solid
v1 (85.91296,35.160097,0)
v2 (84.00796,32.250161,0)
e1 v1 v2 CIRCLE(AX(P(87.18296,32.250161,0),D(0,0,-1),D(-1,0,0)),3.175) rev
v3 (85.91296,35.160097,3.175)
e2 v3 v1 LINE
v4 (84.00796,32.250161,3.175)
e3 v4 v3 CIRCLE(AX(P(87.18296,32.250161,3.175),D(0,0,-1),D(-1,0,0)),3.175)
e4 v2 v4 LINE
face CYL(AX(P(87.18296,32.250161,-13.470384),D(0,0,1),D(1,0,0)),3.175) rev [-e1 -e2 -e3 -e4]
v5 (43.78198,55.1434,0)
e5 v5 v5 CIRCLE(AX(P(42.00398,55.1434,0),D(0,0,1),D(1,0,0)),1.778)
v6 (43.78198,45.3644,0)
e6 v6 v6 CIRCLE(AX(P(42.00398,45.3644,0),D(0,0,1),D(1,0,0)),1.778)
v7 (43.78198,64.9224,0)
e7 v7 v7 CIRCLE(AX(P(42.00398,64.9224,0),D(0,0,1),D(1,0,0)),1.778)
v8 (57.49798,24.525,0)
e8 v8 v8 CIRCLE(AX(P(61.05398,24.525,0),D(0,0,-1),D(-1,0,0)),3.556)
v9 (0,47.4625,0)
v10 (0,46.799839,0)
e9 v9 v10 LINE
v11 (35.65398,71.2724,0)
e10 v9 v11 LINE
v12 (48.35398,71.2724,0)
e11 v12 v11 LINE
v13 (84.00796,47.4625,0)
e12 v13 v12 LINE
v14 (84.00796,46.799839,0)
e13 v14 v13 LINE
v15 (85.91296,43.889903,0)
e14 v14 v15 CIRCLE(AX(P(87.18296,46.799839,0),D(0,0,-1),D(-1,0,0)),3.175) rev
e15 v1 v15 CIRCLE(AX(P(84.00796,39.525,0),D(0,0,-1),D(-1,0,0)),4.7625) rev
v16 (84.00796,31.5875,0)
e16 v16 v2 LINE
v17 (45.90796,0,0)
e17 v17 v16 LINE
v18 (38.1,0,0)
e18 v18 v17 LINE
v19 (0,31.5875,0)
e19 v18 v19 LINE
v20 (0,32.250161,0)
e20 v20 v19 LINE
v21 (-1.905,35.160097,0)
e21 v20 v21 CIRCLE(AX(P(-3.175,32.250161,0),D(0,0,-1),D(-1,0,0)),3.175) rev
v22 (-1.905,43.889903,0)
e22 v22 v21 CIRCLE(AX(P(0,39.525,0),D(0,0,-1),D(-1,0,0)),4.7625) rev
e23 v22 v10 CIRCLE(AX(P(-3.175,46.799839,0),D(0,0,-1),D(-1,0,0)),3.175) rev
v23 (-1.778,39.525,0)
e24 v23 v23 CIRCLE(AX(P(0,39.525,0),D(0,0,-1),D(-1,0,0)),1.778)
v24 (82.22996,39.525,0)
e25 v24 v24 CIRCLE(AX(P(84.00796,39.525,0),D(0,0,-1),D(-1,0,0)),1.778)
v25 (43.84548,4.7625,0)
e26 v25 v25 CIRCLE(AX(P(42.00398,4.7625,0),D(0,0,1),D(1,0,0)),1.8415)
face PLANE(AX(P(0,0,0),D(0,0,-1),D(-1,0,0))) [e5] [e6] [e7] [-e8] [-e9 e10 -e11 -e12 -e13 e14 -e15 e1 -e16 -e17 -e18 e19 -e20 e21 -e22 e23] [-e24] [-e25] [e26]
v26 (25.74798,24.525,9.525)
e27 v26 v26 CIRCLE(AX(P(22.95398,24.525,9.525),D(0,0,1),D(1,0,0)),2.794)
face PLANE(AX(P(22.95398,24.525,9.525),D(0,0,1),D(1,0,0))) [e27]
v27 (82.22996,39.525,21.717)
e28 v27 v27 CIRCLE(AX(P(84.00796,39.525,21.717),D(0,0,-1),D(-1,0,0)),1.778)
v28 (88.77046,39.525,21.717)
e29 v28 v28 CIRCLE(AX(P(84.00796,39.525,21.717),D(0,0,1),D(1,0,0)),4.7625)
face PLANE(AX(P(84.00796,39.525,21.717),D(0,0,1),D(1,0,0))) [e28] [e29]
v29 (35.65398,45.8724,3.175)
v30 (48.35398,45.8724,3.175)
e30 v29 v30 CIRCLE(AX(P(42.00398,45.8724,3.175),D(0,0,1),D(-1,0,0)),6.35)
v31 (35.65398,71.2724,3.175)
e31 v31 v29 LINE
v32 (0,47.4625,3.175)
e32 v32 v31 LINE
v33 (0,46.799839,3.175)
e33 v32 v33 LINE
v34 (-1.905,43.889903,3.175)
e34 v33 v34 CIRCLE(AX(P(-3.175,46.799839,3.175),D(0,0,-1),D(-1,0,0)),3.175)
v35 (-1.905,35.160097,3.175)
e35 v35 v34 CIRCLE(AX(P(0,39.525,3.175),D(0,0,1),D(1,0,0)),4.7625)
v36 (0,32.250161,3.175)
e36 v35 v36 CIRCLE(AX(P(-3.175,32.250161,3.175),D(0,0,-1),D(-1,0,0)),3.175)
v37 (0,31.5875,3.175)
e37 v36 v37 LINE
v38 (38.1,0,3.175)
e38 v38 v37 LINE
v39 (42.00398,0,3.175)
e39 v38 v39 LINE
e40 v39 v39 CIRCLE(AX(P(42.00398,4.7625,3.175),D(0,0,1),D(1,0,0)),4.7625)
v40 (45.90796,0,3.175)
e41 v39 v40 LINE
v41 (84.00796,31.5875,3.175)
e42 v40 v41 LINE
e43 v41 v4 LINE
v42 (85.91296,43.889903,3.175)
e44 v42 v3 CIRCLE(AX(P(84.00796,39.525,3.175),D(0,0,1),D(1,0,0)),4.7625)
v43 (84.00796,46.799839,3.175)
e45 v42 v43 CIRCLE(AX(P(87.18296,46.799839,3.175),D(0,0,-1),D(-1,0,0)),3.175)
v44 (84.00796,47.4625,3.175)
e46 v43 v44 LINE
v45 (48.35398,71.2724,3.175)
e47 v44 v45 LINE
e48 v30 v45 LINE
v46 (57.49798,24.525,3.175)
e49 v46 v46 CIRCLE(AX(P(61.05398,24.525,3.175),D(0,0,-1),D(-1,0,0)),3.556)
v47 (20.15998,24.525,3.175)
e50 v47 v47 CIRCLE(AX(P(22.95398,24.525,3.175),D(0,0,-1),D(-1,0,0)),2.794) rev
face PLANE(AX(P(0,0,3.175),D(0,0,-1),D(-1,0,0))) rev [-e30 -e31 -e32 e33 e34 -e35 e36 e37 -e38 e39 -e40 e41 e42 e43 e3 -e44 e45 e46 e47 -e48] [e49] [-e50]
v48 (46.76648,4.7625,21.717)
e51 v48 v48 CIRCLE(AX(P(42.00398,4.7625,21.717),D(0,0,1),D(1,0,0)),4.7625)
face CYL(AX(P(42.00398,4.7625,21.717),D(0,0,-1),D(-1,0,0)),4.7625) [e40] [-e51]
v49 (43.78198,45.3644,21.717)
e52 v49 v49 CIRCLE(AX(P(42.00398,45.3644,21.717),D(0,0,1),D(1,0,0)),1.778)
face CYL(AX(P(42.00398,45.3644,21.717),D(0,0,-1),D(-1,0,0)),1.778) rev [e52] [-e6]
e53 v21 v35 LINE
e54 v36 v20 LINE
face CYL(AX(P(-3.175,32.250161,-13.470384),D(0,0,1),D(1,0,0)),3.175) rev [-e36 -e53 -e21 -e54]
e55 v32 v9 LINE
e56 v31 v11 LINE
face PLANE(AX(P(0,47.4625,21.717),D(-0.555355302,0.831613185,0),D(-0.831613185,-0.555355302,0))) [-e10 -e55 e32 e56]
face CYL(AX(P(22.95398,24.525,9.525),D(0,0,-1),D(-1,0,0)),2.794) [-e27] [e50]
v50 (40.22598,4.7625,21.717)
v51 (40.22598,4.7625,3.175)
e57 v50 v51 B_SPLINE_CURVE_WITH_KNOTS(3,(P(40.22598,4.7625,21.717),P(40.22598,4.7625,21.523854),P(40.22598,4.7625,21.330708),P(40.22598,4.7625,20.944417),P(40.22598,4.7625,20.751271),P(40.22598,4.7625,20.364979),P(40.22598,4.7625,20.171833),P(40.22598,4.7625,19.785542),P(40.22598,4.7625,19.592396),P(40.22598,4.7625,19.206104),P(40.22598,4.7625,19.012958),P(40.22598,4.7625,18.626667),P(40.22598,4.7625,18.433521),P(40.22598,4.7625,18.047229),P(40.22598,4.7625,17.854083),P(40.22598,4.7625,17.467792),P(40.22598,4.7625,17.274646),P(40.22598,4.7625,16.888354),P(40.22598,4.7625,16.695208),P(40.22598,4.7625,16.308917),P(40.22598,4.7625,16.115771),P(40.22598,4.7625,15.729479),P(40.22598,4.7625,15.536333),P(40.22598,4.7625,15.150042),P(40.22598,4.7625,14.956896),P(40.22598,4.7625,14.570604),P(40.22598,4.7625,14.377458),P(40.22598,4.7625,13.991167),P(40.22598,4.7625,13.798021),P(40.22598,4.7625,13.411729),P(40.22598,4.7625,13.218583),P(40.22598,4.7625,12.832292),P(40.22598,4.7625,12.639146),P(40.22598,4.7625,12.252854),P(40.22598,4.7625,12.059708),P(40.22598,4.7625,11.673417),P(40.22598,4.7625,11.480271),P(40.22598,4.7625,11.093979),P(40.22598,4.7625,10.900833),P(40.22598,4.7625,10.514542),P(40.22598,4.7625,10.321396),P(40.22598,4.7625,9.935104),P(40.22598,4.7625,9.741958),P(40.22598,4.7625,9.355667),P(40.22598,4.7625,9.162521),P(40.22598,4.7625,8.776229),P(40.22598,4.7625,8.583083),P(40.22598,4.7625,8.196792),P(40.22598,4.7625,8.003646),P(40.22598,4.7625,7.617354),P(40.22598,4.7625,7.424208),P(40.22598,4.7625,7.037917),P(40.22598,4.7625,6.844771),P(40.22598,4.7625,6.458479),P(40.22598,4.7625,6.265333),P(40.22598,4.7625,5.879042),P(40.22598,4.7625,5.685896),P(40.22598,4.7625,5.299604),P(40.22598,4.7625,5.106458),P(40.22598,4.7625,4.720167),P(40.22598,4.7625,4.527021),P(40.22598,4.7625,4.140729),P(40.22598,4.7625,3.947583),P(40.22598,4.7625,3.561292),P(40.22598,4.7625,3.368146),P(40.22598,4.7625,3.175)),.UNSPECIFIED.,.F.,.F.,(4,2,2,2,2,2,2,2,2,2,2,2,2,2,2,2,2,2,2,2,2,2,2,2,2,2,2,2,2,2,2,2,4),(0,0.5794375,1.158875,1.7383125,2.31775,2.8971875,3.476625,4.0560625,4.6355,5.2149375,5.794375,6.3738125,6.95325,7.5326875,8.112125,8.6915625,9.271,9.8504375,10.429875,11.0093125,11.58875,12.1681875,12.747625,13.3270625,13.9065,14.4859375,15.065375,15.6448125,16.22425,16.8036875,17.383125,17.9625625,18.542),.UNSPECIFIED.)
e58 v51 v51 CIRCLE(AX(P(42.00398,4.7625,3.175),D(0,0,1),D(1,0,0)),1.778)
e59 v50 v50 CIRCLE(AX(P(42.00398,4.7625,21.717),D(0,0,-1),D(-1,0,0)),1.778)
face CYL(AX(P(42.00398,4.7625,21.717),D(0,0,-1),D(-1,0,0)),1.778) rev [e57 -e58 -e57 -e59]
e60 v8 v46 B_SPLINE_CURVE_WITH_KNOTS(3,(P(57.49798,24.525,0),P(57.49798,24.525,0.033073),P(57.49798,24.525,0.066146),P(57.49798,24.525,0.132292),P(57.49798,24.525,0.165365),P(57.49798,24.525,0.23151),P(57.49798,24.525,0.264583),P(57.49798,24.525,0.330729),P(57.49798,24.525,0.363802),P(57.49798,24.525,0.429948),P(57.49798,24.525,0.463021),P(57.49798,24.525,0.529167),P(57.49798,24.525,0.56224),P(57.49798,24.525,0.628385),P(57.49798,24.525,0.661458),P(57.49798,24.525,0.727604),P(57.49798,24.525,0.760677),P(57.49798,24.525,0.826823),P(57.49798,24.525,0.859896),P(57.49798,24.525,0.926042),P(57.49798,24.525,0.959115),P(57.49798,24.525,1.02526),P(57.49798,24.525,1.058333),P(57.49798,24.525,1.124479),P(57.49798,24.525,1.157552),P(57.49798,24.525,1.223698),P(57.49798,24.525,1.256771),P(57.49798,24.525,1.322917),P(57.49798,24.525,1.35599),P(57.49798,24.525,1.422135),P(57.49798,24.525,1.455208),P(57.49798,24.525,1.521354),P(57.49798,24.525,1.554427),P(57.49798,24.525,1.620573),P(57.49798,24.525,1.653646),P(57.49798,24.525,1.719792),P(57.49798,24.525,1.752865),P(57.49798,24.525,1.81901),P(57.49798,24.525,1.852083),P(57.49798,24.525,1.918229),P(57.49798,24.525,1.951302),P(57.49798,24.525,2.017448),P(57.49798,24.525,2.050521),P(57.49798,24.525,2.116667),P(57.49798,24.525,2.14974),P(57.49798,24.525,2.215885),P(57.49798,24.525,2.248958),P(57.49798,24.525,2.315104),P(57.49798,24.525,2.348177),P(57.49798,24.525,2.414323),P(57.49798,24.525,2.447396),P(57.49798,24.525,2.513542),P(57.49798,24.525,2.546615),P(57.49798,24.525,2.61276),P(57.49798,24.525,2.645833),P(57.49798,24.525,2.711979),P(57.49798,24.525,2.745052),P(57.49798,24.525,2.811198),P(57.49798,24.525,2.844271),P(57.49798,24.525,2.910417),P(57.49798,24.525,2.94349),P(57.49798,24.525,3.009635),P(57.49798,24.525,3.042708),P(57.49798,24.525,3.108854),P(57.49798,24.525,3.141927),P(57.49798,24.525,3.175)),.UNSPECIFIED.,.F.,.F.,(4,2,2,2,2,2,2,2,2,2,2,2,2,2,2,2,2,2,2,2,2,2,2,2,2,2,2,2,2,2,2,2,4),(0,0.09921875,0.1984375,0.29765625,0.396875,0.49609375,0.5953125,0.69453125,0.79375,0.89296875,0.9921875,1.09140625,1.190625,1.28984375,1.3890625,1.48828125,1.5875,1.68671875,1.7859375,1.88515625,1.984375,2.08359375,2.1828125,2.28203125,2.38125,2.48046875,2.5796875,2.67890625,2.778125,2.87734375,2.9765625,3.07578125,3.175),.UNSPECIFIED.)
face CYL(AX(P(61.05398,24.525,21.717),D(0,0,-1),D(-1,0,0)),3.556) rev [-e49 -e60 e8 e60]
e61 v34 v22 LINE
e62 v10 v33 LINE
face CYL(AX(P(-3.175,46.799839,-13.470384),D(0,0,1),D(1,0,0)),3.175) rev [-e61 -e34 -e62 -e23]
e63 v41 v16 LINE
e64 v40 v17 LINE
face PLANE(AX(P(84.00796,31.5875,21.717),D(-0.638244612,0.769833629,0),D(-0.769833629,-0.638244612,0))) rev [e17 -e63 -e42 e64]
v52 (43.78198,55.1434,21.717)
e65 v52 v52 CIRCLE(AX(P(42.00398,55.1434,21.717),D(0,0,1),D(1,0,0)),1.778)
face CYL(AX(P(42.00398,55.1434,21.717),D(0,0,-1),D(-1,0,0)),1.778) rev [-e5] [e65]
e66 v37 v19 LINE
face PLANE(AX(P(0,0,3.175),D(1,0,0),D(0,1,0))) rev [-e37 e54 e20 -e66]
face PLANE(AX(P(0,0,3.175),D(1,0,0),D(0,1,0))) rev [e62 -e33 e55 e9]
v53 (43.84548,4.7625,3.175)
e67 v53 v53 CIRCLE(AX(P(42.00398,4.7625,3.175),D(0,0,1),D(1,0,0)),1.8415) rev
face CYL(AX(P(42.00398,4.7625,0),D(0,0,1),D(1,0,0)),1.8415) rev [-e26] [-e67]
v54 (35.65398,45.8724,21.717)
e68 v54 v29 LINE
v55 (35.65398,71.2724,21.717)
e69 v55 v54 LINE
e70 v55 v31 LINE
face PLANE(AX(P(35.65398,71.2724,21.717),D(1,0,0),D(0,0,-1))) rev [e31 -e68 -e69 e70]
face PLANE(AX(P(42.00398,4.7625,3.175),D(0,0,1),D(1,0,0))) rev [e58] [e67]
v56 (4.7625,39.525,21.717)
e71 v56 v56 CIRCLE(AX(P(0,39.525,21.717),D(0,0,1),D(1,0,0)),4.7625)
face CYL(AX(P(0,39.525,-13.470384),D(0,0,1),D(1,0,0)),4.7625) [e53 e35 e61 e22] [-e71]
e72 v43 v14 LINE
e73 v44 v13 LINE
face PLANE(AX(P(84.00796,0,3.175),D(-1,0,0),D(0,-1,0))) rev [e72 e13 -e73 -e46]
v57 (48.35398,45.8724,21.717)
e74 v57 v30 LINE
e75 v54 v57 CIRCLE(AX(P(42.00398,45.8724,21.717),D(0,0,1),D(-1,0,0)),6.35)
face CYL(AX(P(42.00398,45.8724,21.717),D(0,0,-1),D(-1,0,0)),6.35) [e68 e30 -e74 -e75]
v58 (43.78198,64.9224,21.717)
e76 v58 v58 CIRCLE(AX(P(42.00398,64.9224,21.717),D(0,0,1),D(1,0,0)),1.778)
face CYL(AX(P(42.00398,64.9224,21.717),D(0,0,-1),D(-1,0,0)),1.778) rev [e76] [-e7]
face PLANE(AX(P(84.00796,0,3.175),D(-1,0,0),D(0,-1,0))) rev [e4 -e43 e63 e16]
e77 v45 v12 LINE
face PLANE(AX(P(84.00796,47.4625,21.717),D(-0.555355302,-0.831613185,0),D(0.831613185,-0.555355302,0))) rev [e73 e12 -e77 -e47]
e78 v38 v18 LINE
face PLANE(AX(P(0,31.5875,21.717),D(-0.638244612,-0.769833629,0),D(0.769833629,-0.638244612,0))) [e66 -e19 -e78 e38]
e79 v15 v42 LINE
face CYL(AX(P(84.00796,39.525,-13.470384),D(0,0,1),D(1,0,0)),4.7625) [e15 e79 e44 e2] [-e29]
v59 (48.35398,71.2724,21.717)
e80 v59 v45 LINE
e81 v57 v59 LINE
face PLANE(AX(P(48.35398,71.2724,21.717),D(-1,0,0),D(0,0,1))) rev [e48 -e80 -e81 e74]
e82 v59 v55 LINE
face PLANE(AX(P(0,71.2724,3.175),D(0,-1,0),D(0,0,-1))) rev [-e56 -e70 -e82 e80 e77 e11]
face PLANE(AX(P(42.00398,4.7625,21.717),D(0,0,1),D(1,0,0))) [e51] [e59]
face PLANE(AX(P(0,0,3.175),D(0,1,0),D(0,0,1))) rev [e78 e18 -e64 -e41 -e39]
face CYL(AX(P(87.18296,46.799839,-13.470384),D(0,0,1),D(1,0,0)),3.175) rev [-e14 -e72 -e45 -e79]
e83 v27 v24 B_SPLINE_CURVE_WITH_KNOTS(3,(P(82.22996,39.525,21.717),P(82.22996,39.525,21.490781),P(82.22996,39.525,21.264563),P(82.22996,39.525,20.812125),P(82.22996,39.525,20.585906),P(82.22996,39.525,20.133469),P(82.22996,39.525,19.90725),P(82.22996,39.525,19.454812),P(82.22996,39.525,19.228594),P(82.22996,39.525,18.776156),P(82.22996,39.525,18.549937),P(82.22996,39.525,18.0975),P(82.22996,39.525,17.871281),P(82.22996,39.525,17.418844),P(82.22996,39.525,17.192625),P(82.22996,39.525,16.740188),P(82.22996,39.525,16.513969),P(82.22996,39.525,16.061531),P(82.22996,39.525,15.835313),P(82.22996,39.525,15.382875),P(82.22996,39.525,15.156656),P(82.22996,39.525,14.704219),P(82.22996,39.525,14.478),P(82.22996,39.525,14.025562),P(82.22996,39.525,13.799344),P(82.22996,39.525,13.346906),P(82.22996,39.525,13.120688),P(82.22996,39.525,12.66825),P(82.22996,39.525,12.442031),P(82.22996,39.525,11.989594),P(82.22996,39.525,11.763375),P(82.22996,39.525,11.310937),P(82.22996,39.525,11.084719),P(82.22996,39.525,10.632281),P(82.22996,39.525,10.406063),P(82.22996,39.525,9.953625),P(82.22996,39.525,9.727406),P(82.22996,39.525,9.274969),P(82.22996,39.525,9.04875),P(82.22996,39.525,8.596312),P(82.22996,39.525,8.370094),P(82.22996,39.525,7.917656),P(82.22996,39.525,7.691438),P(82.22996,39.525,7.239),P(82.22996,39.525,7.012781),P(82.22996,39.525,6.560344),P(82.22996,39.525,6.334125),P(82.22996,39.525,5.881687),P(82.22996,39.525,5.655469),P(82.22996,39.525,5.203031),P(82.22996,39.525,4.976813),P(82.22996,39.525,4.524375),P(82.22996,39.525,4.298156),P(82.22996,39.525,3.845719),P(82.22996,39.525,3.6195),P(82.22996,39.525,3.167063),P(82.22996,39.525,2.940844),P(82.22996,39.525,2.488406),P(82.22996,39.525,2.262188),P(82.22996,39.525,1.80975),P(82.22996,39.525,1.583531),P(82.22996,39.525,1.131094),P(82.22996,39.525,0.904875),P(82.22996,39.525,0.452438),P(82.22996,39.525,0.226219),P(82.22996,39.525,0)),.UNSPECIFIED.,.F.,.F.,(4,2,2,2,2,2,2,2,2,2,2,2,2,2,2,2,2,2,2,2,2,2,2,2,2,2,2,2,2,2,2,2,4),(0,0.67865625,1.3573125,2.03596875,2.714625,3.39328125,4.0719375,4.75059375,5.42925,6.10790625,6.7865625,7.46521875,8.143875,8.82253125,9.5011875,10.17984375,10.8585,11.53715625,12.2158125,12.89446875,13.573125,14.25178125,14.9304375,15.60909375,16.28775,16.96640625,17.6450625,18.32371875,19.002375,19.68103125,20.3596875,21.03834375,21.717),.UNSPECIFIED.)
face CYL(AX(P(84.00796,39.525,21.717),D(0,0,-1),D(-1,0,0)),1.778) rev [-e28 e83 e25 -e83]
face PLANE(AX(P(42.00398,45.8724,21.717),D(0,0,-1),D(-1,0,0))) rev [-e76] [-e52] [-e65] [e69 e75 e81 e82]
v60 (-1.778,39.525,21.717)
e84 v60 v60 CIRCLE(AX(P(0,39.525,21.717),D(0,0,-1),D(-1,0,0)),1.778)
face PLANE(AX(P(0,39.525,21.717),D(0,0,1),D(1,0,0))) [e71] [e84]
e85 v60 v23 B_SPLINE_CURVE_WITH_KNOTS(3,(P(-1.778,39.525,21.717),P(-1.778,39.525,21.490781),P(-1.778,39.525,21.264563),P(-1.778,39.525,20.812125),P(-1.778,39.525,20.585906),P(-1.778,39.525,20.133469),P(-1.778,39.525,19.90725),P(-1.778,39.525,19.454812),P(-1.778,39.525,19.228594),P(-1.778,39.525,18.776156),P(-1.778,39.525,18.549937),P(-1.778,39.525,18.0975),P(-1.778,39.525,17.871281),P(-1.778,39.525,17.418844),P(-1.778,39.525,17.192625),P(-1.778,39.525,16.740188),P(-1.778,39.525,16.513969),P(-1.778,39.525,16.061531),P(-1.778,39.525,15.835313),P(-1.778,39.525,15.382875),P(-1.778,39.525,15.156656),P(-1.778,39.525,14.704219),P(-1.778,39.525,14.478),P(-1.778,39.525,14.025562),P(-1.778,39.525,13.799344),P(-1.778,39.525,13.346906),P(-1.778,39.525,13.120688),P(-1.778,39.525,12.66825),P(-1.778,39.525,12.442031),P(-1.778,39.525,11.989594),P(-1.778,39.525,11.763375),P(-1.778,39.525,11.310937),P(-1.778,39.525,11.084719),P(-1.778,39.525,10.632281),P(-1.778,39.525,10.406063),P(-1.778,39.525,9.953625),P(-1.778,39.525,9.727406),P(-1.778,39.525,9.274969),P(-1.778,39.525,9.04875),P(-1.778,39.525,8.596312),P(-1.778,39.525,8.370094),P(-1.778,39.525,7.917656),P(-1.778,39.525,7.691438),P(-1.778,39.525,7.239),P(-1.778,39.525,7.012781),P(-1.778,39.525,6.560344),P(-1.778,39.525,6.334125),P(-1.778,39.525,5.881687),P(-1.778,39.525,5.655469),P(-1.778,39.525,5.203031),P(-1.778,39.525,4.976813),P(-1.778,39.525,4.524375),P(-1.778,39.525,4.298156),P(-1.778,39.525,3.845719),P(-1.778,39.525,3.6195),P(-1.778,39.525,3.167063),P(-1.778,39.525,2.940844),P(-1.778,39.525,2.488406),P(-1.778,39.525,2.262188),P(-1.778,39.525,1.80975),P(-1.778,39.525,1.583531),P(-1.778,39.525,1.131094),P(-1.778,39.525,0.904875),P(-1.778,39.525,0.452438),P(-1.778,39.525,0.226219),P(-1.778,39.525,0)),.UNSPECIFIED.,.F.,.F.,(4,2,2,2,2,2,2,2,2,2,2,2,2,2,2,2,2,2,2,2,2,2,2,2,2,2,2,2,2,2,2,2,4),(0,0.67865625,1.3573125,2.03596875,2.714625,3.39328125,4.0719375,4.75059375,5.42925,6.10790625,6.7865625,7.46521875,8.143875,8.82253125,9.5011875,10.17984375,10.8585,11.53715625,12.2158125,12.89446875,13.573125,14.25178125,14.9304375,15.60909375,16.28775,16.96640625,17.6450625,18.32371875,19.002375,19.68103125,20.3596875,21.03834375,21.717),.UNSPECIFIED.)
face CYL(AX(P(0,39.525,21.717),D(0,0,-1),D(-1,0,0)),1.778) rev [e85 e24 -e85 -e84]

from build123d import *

# Parameters (mm, degrees)
SKETCH1_W               = 84.00796
SKETCH1_H               = 71.2724
BOSS_EXTRUDE1_DEPTH     = 3.175
SKETCH5_R               = 4.7625
BOSS_EXTRUDE3_DEPTH     = 3.175
SKETCH3_R               = 1.8415
CUT_EXTRUDE1_DEPTH      = 114.886040389
BOSS_EXTRUDE4_START     = 18.542
SKETCH6_R               = 4.7625
BOSS_EXTRUDE4_DEPTH     = 18.542
CUT_EXTRUDE2_DEPTH      = 116.341906237
CUT_EXTRUDE2_DEPTH_BACK = 116.341906237
SKETCH4_R               = 1.778
SKETCH7_R               = 1.778
CUT_EXTRUDE3_DEPTH      = 116.894683482
SKETCH8_R               = 3.556
SKETCH8_R_2             = 1.905
CUT_EXTRUDE4_DEPTH      = 116.894683482
CUT_EXTRUDE5_DEPTH      = 116.894683482
FILLET1_R               = 3.175
SKETCH10_R              = 2.794
BOSS_EXTRUDE5_DEPTH     = 6.35
BOSS_EXTRUDE6_START     = 3.175
SKETCH11_R              = 1.905
BOSS_EXTRUDE6_DEPTH     = 3.175


with BuildPart() as part:
    # Sketch1 → Boss-Extrude1 (new body)
    with BuildSketch(Plane.XY):
        with Locations((42.00398, 35.6362)):
            Rectangle(SKETCH1_W, SKETCH1_H)
    extrude(amount=BOSS_EXTRUDE1_DEPTH)

    # Sketch5 → Boss-Extrude3 (add)
    with BuildSketch(Plane.XY.offset(3.175)):
        with Locations((84.00796, 39.524999944)):
            Circle(SKETCH5_R)
        with Locations((0, 39.524999944)):
            Circle(SKETCH5_R)
    extrude(amount=-BOSS_EXTRUDE3_DEPTH)

    # Sketch3 → Cut-Extrude1 (cut, through all)
    with BuildSketch(Plane.XY.offset(3.175)):
        with Locations((42.00398, 4.7625)):
            Circle(SKETCH3_R)
    extrude(amount=-CUT_EXTRUDE1_DEPTH, mode=Mode.SUBTRACT)

    # Sketch6 → Boss-Extrude4 (add)
    with BuildSketch(Plane.XY.offset(3.175).offset(BOSS_EXTRUDE4_START)):
        with Locations((84.00796, 39.524999944)):
            Circle(SKETCH6_R)
        with Locations((0, 39.524999944)):
            Circle(SKETCH6_R)
        with Locations(Location((42.00398, 4.7625, 0), (0, 0, 270))):
            Circle(SKETCH6_R)
        with BuildLine():
            Line((35.65398, 71.2724), (48.35398, 71.2724))
            Line((48.35398, 71.2724), (48.35398, 45.8724))
            ThreePointArc((48.35398, 45.8724), (42.00398, 39.5224), (35.65398, 45.8724))
            Line((35.65398, 45.8724), (35.65398, 71.2724))
        make_face()
    extrude(amount=-BOSS_EXTRUDE4_DEPTH)

    # Sketch4 → Cut-Extrude2 (cut, two sides: drawn at the far end of the back side and taken through both)
    with BuildSketch(Plane.XY.offset(3.175).offset(-CUT_EXTRUDE2_DEPTH_BACK)):
        with Locations((42.00398, 64.9224)):
            Circle(SKETCH4_R)
        with Locations((42.00398, 55.1434)):
            Circle(SKETCH4_R)
        with Locations((42.00398, 45.3644)):
            Circle(SKETCH4_R)
    extrude(amount=CUT_EXTRUDE2_DEPTH + CUT_EXTRUDE2_DEPTH_BACK, mode=Mode.SUBTRACT)

    # Sketch7 → Cut-Extrude3 (cut, through all)
    with BuildSketch(Plane(origin=(0, 0, 0), x_dir=(-1, 0, 0), z_dir=(0, 0, -1))):
        with Locations((-42.00398, 4.7625)):
            Circle(SKETCH7_R)
        with Locations((0, 39.524999944)):
            Circle(SKETCH7_R)
        with Locations((-84.00796, 39.524999944)):
            Circle(SKETCH7_R)
    extrude(amount=-CUT_EXTRUDE3_DEPTH, mode=Mode.SUBTRACT)

    # Sketch8 → Cut-Extrude4 (cut, through all)
    with BuildSketch(Plane(origin=(0, 0, 0), x_dir=(-1, 0, 0), z_dir=(0, 0, -1))):
        with Locations((-61.05398, 24.524999972)):
            Circle(SKETCH8_R)
        with Locations((-22.95398, 24.524999972)):
            Circle(SKETCH8_R_2)
    extrude(amount=-CUT_EXTRUDE4_DEPTH, mode=Mode.SUBTRACT)

    # Sketch9 → Cut-Extrude5 (cut, through all)
    with BuildSketch(Plane(origin=(0, 0, 0), x_dir=(-1, 0, 0), z_dir=(0, 0, -1))):
        Polygon((-84.00796, 0), (-84.00796, 31.587499944), (-45.90796, 0), align=None)
        Polygon((-84.00796, 71.2724), (-84.00796, 47.462499944), (-48.35398, 71.2724), align=None)
    cut_extrude5 = extrude(amount=-CUT_EXTRUDE5_DEPTH, mode=Mode.SUBTRACT)

    # Mirror1: Cut-Extrude5 across plane
    add(cut_extrude5.mirror(Plane(origin=(42.00398, 0, 0), x_dir=(0, 0, 1), z_dir=(1, 0, 0))), mode=Mode.SUBTRACT)

    # Fillet1
    # the kernel refuses this fillet: 3.175 mm, written as the material it adds along each edge
    with BuildSketch(Plane(origin=(84.00796, 34.762499944, 0), x_dir=(0.9789063129307042, 0.2043096436892158, 0), z_dir=(0, 0, 1))) as fillet1_piece_1:
        with BuildLine():
            CenterArc((2.594732475, -3.108027544), FILLET1_R, 101.789089239, 66.421821522)
            Line((-0.513295069, -2.459344425), (0, 0))
            ThreePointArc((0, 0), (0.973024678, -0.100458685), (1.946049356, 0))
        make_face()
    extrude(amount=3.175)
    with BuildSketch(Plane(origin=(84.00796, 44.287499944, 0), x_dir=(0, 1, 0), z_dir=(0, 0, 1)), Plane(origin=(0, 34.762499944, 0), x_dir=(0, -1, 0), z_dir=(0, 0, 1))) as fillet1_piece_2:
        with BuildLine():
            CenterArc((2.512338916, -3.175), FILLET1_R, 90, 66.421821522)
            ThreePointArc((-0.397596651, -1.905), (-0.100458685, -0.973024678), (0, 0))
            Line((0, 0), (2.512338916, 0))
        make_face()
    extrude(amount=3.175)
    with BuildSketch(Plane(origin=(0, 44.287499944, 0), x_dir=(0, 1, 0), z_dir=(0, 0, 1))) as fillet1_piece_3:
        with BuildLine():
            CenterArc((2.512338916, 3.175), FILLET1_R, 203.578178478, 66.421821522)
            ThreePointArc((-0.397596651, 1.905), (-0.100458685, 0.973024678), (0, 0))
            Line((0, 0), (2.512338916, 0))
        make_face()
    extrude(amount=3.175)

    # Sketch10 → Boss-Extrude5 (add)
    with BuildSketch(Plane.XY.offset(3.175)):
        with Locations(Location((22.95398, 24.524999972, 0), (0, 0, 180))):
            Circle(SKETCH10_R)
    extrude(amount=BOSS_EXTRUDE5_DEPTH)

    # Sketch11 → Boss-Extrude6 (add)
    with BuildSketch(Plane(origin=(0, 0, 3.175), x_dir=(-1, 0, 0), z_dir=(0, 0, -1)).offset(BOSS_EXTRUDE6_START)):
        with Locations((-22.95398, 24.524999972)):
            Circle(SKETCH11_R)
    extrude(amount=-BOSS_EXTRUDE6_DEPTH)


solid = part.part
